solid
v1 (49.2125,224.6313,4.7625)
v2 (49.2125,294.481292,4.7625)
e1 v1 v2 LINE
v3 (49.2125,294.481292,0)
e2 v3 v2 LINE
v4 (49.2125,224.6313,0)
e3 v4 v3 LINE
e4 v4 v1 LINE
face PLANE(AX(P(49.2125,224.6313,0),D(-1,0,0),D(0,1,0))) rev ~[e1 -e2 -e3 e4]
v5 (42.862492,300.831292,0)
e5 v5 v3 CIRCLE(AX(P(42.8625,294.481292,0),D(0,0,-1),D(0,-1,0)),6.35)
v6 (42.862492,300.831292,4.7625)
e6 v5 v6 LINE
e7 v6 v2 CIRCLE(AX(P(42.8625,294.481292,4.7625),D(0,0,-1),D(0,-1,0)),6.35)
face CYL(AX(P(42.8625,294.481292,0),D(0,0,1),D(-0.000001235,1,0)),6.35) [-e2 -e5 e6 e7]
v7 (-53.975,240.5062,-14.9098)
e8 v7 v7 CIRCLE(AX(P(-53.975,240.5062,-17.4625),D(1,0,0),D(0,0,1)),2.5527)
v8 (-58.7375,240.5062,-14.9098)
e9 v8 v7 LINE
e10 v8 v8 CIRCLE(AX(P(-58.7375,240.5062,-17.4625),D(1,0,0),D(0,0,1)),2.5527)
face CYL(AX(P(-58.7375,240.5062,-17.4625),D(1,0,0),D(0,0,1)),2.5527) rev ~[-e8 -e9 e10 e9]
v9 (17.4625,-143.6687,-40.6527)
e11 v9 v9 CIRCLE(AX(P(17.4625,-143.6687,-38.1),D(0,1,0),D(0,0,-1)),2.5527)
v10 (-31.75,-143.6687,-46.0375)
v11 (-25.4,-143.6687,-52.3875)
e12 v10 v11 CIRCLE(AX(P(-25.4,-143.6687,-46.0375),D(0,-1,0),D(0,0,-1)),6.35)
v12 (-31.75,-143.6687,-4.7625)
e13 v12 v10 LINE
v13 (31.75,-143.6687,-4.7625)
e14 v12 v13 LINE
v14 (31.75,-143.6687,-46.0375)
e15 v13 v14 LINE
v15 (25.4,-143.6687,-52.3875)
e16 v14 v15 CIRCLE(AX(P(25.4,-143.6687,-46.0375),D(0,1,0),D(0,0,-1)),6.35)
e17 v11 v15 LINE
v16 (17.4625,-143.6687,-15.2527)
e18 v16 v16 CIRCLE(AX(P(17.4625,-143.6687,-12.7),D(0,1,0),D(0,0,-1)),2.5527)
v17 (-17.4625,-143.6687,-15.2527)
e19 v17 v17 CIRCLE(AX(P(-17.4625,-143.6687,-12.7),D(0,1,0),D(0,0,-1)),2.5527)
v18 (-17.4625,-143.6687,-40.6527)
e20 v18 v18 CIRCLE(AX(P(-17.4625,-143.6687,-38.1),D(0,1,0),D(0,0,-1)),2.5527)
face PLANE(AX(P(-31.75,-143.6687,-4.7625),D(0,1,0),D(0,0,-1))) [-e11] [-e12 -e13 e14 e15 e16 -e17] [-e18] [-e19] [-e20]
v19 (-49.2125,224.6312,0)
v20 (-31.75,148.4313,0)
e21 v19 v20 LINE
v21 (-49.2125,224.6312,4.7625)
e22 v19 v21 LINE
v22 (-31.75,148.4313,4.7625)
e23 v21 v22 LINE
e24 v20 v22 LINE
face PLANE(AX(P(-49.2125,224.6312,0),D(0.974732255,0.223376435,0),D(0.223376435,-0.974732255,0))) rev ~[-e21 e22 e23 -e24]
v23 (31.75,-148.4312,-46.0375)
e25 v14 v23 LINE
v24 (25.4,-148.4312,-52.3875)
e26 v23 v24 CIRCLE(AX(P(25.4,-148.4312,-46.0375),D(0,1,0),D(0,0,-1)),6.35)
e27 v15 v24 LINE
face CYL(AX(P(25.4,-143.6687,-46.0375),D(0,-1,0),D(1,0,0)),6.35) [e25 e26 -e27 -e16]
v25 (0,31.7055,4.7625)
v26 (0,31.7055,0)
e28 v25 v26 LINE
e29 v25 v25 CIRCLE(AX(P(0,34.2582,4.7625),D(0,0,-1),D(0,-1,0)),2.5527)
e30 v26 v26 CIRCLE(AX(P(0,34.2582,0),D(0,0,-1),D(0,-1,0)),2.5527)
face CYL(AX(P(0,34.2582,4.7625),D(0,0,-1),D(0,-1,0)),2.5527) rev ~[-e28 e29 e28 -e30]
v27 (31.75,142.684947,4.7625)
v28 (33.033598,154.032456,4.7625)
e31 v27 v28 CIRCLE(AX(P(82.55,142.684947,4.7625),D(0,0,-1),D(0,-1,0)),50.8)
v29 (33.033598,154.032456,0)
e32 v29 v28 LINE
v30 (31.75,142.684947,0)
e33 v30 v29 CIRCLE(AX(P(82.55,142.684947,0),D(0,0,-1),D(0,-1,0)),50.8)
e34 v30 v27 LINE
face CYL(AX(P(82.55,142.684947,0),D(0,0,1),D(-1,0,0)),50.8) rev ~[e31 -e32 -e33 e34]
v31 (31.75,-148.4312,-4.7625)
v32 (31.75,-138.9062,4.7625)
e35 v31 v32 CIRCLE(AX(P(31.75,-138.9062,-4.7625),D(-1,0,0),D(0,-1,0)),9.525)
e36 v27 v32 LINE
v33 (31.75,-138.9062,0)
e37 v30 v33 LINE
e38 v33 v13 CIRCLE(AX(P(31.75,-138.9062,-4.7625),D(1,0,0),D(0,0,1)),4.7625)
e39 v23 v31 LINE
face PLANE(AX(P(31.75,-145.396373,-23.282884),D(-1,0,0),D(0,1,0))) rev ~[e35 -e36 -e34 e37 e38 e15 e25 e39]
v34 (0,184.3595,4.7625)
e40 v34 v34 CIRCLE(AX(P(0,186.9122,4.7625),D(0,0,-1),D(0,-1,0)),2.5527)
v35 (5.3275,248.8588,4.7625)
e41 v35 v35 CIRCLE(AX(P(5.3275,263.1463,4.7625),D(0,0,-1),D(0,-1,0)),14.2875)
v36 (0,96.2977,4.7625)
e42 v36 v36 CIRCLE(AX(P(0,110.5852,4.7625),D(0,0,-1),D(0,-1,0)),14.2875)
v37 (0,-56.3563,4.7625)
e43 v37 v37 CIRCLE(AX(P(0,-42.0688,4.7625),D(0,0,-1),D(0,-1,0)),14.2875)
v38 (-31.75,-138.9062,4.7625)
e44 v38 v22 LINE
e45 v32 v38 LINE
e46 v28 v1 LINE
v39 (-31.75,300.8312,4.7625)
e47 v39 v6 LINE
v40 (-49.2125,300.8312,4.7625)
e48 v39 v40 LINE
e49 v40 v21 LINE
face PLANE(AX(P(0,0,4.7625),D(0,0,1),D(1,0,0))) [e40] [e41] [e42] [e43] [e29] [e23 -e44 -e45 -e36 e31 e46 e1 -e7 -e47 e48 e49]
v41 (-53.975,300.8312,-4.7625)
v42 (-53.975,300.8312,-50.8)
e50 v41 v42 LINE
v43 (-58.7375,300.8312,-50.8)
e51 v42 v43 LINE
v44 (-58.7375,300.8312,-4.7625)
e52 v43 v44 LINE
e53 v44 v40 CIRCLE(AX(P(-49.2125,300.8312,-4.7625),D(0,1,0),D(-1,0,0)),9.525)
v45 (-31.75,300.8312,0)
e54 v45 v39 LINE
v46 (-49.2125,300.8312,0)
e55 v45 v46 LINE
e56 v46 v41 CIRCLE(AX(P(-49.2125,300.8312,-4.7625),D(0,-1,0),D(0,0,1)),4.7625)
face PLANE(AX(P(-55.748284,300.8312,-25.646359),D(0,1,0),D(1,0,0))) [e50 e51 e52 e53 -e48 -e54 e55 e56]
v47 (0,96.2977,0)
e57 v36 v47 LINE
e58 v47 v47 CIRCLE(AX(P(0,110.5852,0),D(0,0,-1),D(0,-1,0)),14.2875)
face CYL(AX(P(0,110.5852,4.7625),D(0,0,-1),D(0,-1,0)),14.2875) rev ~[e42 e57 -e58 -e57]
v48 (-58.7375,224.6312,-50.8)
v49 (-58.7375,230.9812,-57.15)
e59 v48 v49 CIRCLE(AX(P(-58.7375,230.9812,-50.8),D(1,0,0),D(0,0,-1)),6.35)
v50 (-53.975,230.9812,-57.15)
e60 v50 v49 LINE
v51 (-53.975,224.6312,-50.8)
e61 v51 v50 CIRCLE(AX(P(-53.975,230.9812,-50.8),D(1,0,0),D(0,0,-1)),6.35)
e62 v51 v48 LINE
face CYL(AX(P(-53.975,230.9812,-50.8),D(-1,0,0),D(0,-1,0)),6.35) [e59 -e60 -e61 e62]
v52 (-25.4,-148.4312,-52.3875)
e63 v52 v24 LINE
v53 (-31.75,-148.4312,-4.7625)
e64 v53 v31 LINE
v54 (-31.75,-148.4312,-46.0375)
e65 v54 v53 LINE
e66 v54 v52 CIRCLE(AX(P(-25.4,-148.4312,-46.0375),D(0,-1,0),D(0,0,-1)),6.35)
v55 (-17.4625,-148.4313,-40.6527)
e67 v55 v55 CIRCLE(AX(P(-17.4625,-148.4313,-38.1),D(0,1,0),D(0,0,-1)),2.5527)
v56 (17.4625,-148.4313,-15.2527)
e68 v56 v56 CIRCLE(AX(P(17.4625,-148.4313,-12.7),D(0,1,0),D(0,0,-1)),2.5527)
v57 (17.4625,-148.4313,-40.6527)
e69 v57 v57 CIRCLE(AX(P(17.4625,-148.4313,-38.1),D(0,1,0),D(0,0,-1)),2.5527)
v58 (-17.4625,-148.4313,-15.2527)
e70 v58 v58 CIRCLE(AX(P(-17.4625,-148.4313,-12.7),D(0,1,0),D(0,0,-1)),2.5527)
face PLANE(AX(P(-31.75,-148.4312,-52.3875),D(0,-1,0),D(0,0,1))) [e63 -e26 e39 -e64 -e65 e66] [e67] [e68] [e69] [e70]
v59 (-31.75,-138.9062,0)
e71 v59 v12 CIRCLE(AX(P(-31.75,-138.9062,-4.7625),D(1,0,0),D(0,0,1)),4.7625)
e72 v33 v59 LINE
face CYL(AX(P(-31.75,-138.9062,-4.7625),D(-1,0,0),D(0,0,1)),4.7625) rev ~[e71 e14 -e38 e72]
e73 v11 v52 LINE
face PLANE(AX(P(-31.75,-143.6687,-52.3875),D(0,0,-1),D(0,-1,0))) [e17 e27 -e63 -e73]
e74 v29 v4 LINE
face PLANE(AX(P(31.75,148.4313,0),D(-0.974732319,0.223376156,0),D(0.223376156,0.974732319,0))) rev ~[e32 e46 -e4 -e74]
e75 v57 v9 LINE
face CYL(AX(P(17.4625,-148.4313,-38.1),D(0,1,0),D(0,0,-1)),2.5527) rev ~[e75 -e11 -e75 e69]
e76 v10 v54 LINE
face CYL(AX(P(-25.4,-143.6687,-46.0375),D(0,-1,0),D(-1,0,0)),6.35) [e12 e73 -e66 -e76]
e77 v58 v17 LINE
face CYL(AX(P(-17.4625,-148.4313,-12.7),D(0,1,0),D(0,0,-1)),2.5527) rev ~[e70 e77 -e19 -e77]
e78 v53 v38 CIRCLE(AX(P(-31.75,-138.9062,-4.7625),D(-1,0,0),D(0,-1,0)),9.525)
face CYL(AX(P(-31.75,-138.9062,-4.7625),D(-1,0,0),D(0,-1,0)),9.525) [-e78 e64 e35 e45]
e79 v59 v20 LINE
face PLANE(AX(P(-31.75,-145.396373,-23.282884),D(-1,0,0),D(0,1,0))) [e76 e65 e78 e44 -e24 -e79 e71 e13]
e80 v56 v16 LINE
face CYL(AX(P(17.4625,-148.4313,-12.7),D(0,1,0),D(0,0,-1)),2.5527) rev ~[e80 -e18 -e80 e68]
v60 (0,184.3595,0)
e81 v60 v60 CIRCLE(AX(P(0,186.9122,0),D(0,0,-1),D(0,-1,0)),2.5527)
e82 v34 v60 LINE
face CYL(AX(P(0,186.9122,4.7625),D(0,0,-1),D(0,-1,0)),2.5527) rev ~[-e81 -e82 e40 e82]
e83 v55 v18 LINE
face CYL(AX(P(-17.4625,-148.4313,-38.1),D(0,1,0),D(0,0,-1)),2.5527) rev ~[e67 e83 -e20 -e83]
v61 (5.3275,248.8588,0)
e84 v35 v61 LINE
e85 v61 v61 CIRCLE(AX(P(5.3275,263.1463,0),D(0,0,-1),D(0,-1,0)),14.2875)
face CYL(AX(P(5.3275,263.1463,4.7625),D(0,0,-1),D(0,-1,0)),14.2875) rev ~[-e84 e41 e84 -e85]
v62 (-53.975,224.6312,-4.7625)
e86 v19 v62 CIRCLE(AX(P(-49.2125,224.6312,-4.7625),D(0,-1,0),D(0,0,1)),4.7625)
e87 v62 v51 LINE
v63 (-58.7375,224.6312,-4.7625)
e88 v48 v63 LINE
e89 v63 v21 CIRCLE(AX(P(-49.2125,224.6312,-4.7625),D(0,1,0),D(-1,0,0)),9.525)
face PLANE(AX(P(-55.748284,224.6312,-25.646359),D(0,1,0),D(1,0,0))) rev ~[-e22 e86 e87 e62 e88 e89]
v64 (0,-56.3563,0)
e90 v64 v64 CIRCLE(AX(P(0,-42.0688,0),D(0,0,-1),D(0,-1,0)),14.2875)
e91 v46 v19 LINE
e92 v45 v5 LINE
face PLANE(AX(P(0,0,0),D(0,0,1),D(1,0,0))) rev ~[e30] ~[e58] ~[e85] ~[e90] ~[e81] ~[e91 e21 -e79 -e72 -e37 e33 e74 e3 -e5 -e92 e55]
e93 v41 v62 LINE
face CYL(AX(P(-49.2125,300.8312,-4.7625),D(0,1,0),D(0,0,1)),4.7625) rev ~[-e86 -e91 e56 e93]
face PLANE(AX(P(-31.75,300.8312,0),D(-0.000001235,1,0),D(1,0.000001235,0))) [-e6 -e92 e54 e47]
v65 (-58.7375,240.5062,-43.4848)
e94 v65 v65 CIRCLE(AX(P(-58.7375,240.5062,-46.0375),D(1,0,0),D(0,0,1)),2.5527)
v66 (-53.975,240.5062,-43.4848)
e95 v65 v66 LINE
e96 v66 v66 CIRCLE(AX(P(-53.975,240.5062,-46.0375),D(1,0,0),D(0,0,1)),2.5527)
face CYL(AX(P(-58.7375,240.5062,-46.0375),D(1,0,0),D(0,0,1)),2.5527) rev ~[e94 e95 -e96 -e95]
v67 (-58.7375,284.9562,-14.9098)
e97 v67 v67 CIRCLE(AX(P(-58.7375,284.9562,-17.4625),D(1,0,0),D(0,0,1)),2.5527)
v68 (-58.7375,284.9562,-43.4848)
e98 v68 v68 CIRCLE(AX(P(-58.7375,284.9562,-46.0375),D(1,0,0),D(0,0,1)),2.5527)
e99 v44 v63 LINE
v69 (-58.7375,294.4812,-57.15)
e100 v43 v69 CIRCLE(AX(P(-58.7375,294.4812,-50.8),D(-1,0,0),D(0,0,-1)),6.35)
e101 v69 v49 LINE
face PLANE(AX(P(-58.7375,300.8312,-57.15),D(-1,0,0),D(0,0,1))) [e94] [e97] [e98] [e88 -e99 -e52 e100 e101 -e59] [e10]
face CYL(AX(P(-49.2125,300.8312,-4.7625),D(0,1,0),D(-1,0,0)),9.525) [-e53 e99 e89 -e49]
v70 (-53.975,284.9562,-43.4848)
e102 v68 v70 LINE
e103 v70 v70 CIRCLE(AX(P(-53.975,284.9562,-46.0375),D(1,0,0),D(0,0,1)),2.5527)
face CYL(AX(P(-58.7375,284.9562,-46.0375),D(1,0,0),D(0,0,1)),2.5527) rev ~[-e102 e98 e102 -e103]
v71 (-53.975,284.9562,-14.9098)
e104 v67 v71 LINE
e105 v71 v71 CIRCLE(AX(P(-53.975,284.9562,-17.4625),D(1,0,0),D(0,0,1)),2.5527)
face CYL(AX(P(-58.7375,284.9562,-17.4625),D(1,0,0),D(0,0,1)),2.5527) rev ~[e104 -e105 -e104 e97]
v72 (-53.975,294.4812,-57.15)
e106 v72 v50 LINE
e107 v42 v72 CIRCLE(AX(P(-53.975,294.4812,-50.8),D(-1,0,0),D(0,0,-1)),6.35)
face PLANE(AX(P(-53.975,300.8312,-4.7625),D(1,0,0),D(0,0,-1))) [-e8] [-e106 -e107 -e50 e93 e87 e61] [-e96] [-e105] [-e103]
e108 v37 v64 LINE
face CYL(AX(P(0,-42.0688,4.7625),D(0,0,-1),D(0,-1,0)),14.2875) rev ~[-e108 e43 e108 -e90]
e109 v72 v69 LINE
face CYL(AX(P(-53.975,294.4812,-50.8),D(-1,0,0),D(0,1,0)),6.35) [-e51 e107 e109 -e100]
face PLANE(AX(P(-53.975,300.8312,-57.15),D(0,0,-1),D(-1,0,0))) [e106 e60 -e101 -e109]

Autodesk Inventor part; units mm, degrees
ref_plane "YZ Plane" through (0, 0, 0) normal (1, 0, 0) x (0, 1, 0)
ref_plane "XZ Plane" through (0, 0, 0) normal (0, 1, 0) x (-1, 0, 0)
ref_plane "XY Plane" through (0, 0, 0) normal (0, 0, 1) x (1, 0, 0)
sketch "Sketch1" plane through (0, 0, 0) normal (0, 0, 1) x (1, 0, 0)
  line L0 (31.75, -148.4313) -> (-31.75, -148.4313)
  line L1 (-31.75, -148.4313) -> (-31.75, 148.4313)
  line L2 (-31.75, 148.4313) -> (31.75, 148.4313) construction
  line L3 (31.75, 148.4313) -> (31.75, -148.4313)
  line L4 (31.75, -148.4313) -> (-31.75, 148.4313) construction
  line L5 (-31.75, -148.4313) -> (31.75, 148.4313) construction
  line L6 (31.75, 148.4313) -> (49.2125, 224.6313)
  line L7 (-31.75, 148.4313) -> (-31.75, 300.8312) construction
  line L8 (-31.75, 300.8312) -> (49.2125, 300.8313)
  line L9 (49.2125, 224.6313) -> (49.2125, 300.8313)
  line L10 (-31.75, 300.8312) -> (-49.2125, 300.8312)
  line L11 (-49.2125, 300.8312) -> (-49.2125, 224.6312)
  line L12 (-49.2125, 224.6312) -> (-31.75, 224.6312) construction
  line L13 (-31.75, 224.6312) -> (-31.75, 300.8312) construction
  line L14 (-49.2125, 224.6312) -> (-31.75, 148.4313)
  point P0 (0, 0)
  dimension "d0" = 63.5
  dimension "d1" = 296.8625
  dimension "d2" = 80.9625
  dimension "d3" = 152.4
  dimension "d43" = 76.2
  dimension "d63" = 17.4625
  dimension "d64" = 76.2
extrude "Plate1" add sketch "Sketch1" along normal blind 4.7625
sketch "Sketch2" plane through (0, 0, 4.7625) normal (0, 0, 1) x (1, 0, 0)
  line L0 (31.75, -148.4313) -> (-31.75, -148.4313) construction
  line L1 (-31.75, -148.4313) -> (-31.75, 148.4313) construction
  line L2 (0, 110.5852) -> (5.3275, 263.1463) construction
  line L3 (0, 110.5852) -> (152.654, 110.5852) construction
  point P0 (0, 0)
  point P1 (0, -42.0688)
  point P2 (0, -148.4313)
  point P3 (-31.75, 300.0375)
  dimension "d5" = 106.3625
  dimension "d8" = 152.654
  dimension "d29" = 31.75
  dimension "d98" = 152.654
  dimension "d99" = 88
hole "Hole1" at (0, 110.5852, 4.7625) at (5.3275, 263.1463, 4.7625) at (0, -42.0688, 4.7625) direction (0, 0, -1) diameter 28.575 end through all
sketch "Sketch3" plane through (0, 0, 4.7625) normal (0, 0, 1) x (1, 0, 0)
  circle A0 centre (0, 110.5852) radius 14.2875 construction
  line L0 (0, 110.5852) -> (0, -42.0688) construction
  line L1 (0, 110.5852) -> (0, 263.2392) construction
  circle A1 centre (5.3275, 262.3525) radius 14.2875 projected
  circle A2 centre (0, -42.8625) radius 14.2875 projected
  point P0 (0, 0)
  point P1 (0, 186.9122)
  point P2 (0, 34.2582)
hole "Hole2" at (0, 34.2582, 4.7625) at (0, 186.9122, 4.7625) direction (0, 0, -1) diameter 5.1054 end through all clearance for "Flat Head Machine Screw (82)" size "#10" standard "Ansi Unified Screw Threads"
fillet "Corner Round1" radius 50.8 1 edges at (31.75, 148.4313, 2.3813)
sketch "Sketch5" plane through (-31.75, -143.6687, 4.7625) normal (0, -1, 0) x (1, 0, 0)
  line L0 (63.5, 0) -> (0, 0)
  line L1 (0, 0) -> (0, -57.15)
  line L2 (0, -57.15) -> (63.5, -57.15)
  line L3 (63.5, -57.15) -> (63.5, 0)
edge flange "Flange2" height 52.3875 angle 90 thickness 4.7625 bend radius 4.7625 thickness toward (0, -1, 0) relief tear relief width 4.7625 relief depth 2.3813 edges at (0, -148.4313, 0) wall of the first edge with corners at (31.75, -143.6687, 4.7625) (-31.75, -143.6687, 4.7625) (-31.75, -143.6687, -52.3875) (31.75, -143.6687, -52.3875)
bend "Bend2"
corner "Corner2"
sketch "Sketch7" plane through (-53.975, 300.8312, -4.7625) normal (-1, 0, 0) x (0, -1, 0)
  line L0 (76.2, 0) -> (0, 0)
  line L1 (0, 0) -> (0, -52.3875)
  line L2 (0, -52.3875) -> (76.2, -52.3875)
  line L3 (76.2, -52.3875) -> (76.2, 0)
edge flange "Flange3" height 61.9125 angle 90 thickness 4.7625 bend radius 4.7625 thickness toward (-1, 0, 0) relief tear relief width 4.7625 relief depth 2.3813 edges at (-49.2125, 262.7312, 0) wall of the first edge with corners at (-53.975, 224.6312, -4.7625) (-53.975, 300.8312, -4.7625) (-53.975, 300.8312, -57.15) (-53.975, 224.6312, -57.15)
bend "Bend3"
corner "Corner3"
sketch "Sketch8" plane through (-58.7375, 224.6312, -57.15) normal (-1, 0, 0) x (0, 0, 1)
  line L0 (0, 76.2) -> (52.3875, 76.2) projected
  line L1 (0, 0) -> (0, 76.2) projected
  line L2 (52.3875, 0) -> (52.3875, 76.2) construction
  point P0 (57.15, -224.6312)
  point P1 (39.6875, 60.325)
  point P2 (39.6875, 15.875)
  point P3 (11.1125, 15.875)
  point P4 (11.1125, 60.325)
  dimension "d75" = 44.45
  dimension "d76" = 28.575
  dimension "d77" = 15.875
  dimension "d101" = 12.7
hole "Hole4" at (-58.7375, 284.9562, -17.4625) at (-58.7375, 240.5062, -17.4625) at (-58.7375, 240.5062, -46.0375) at (-58.7375, 284.9562, -46.0375) direction (1, 0, 0) diameter 5.1054 end through all
sketch "Sketch9" plane through (-31.75, -148.4313, -52.3875) normal (0, -1, 0) x (1, 0, 0)
  line L0 (0, 0) -> (0, 47.625) projected
  line L1 (0, 57.15) -> (63.5, 57.15) projected
  line L2 (63.5, 0) -> (0, 0) projected
  point P0 (31.75, 52.3875)
  point P1 (14.2875, 39.6875)
  point P2 (49.2125, 39.6875)
  point P3 (49.2125, 14.2875)
  point P4 (14.2875, 14.2875)
  dimension "d86" = 14.2875
  dimension "d87" = 25.4
  dimension "d88" = 34.925
  dimension "d90" = 14.2875
hole "Hole5" at (-17.4625, -148.4313, -12.7) at (17.4625, -148.4313, -12.7) at (17.4625, -148.4313, -38.1) at (-17.4625, -148.4313, -38.1) direction (0, 1, 0) diameter 5.1054 end through all
fillet "Corner Round2" radius 6.35 5 edges at (-56.3563, 224.6312, -57.15) (-56.3563, 300.8312, -57.15) (-31.75, -146.05, -52.3875) (31.75, -146.05, -52.3875) (49.2125, 300.8313, 2.3813)
equation "\"d18\" = Thickness"
equation "\"d84\" = Thickness"
equation "\"d4\" = Thickness"
equation "\"d44\" = BendReliefWidth"
equation "\"d45\" = BendReliefDepth"
equation "\"d46\" = MinimumRemnant"
equation "\"d47\" = TransitionRadius"
equation "\"d50\" = BendRadius"
equation "\"d51\" = CornerReliefSize"
equation "\"d52\" = GapSize"
equation "\"d53\" = JacobiRadiusSize"
equation "\"d65\" = BendReliefWidth"
equation "\"d66\" = BendReliefDepth"
equation "\"d67\" = MinimumRemnant"
equation "\"d68\" = TransitionRadius"
equation "\"d71\" = BendRadius"
equation "\"d72\" = CornerReliefSize"
equation "\"d73\" = GapSize"
equation "\"d74\" = JacobiRadiusSize"
equation "\"d90\" = d86"
equation "\"BendRadius\" = Thickness"
equation "\"BendReliefWidth\" = Thickness"
equation "\"BendReliefDepth\" = 0.5 * Thickness"
equation "\"CornerReliefSize\" = 4 * Thickness"
equation "\"MinimumRemnant\" = 2 * Thickness"
equation "\"TransitionRadius\" = BendRadius"
equation "\"JacobiRadiusSize\" = BendRadius"
equation "\"GapSize\" = Thickness"
equation "\"Thickness\" = 4.7625"
properties part number "feeder_guide_plate" material "Polycarbonate, Clear"
